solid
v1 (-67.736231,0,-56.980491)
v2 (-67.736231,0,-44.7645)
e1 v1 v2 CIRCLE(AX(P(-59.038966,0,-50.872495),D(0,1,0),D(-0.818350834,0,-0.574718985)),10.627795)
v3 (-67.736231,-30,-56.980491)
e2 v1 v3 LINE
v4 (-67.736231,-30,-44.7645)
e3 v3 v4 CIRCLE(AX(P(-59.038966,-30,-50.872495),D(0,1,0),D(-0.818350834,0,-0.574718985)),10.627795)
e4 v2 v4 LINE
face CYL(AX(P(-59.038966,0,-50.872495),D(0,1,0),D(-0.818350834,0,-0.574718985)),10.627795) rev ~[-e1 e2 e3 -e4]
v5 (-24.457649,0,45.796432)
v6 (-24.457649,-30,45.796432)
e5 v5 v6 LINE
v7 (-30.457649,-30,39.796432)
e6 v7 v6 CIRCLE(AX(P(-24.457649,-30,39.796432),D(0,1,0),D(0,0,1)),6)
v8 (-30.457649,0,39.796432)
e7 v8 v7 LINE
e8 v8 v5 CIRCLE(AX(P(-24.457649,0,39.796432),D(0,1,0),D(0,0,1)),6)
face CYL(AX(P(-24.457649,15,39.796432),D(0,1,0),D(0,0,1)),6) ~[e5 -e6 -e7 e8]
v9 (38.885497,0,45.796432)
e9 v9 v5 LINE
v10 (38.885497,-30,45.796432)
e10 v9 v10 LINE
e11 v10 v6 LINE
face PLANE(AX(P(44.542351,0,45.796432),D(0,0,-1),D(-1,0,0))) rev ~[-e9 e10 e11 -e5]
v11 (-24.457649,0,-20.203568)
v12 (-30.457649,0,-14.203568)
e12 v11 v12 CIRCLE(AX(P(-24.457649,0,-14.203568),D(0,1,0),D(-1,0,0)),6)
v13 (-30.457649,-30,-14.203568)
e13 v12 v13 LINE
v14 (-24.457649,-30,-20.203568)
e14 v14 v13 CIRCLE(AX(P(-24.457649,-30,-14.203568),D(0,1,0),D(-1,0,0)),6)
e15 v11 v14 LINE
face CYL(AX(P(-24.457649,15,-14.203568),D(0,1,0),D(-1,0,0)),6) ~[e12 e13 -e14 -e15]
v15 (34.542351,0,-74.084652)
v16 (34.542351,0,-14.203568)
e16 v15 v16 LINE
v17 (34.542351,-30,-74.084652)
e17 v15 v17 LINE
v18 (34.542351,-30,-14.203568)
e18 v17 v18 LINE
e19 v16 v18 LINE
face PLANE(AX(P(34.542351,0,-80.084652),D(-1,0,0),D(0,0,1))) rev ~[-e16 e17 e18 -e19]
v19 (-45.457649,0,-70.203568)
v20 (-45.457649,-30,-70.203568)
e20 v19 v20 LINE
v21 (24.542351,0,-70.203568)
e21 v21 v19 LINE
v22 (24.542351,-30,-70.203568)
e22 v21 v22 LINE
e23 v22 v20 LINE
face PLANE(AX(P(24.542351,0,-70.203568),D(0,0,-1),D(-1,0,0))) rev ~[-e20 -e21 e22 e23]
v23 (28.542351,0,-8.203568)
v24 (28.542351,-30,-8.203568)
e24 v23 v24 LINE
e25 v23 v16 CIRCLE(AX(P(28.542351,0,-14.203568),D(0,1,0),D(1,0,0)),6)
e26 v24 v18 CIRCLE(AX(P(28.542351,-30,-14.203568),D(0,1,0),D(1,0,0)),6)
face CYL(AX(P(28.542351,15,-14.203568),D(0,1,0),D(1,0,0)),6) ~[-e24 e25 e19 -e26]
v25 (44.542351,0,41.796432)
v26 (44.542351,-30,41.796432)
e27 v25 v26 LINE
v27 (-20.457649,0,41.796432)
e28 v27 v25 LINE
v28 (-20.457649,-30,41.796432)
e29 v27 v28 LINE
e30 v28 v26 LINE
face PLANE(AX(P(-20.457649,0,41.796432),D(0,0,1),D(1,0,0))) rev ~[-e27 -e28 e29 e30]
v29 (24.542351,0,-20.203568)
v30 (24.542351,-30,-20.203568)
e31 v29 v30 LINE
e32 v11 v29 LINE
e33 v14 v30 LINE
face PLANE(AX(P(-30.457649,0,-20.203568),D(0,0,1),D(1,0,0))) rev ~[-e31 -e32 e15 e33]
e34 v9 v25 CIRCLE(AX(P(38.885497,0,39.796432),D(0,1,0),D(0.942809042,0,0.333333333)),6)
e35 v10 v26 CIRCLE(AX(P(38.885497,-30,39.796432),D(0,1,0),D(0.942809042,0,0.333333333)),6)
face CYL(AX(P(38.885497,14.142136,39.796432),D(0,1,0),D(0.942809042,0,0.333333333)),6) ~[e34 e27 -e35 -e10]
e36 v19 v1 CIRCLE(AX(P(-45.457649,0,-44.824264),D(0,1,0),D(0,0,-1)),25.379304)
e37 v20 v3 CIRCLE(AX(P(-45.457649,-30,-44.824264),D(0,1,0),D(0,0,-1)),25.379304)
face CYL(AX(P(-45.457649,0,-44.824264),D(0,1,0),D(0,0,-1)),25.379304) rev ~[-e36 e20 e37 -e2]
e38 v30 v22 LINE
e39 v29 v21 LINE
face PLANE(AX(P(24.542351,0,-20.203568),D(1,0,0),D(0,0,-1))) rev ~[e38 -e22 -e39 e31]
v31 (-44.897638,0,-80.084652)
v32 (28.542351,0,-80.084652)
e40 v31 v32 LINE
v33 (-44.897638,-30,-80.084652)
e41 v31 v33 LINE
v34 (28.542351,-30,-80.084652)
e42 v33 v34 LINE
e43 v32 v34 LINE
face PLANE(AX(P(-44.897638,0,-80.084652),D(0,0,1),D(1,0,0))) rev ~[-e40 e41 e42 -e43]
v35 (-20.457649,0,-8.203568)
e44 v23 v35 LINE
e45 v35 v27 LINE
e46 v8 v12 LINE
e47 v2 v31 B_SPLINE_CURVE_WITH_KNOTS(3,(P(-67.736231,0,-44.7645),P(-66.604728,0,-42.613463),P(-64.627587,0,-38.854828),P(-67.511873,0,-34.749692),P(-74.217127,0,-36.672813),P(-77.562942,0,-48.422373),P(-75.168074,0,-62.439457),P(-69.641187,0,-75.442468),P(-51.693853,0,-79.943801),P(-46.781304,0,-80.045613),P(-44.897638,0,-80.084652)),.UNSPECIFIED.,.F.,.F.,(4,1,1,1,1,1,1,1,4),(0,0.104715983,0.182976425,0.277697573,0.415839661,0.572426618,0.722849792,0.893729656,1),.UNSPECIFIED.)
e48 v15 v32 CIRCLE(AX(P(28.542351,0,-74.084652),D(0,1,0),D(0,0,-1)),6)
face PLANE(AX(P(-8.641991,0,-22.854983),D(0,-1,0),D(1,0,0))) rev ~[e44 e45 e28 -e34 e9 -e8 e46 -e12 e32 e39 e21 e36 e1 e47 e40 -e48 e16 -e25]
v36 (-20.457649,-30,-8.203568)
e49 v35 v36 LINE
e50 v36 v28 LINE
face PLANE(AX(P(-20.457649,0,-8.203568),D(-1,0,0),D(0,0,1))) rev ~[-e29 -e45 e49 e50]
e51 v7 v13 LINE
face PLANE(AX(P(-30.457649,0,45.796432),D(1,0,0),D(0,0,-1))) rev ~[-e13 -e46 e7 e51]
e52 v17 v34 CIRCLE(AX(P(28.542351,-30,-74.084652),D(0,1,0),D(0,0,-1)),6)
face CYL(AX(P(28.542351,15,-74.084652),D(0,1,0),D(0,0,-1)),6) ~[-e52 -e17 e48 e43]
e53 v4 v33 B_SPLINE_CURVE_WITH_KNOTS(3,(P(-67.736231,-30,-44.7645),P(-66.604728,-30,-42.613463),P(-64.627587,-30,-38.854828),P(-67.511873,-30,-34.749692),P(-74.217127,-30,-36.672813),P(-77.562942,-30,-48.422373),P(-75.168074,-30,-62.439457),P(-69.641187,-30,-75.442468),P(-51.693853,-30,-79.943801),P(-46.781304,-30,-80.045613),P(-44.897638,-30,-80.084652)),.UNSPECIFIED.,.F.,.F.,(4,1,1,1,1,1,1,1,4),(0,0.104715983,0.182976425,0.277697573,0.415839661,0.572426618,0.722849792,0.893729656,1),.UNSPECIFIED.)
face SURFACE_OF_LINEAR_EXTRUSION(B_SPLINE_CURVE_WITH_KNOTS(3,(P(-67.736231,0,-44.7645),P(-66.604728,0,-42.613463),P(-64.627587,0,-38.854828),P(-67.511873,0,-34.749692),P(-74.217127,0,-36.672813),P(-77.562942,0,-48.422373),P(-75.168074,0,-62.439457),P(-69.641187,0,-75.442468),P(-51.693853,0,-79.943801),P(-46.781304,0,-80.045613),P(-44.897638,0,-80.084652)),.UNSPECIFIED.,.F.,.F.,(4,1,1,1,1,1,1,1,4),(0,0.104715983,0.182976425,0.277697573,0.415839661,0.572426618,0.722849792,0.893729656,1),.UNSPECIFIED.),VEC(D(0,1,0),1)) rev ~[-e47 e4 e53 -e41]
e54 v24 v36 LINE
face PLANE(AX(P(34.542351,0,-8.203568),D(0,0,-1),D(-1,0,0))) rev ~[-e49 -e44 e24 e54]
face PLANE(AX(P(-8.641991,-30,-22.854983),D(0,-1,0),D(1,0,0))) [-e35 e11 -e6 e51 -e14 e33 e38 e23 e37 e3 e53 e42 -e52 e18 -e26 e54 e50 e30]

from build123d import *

# Parameters (mm, degrees)
F1_DEPTH    = 30
F2_T1_DEPTH = 60
F2_T3_DEPTH = 58.2842712475


# Not quite as in the source:
# - a fillet or chamfer that OpenCascade refuses, or shapes differently, is made with other operations: its cross-section is extruded or revolved along the edge and cut away or added


with BuildPart() as f1:
    # F0 (on Front) → F1 (new body)
    with BuildSketch(Plane.XZ):
        with BuildLine():
            Line((-20.4576485604, 41.7964319587), (44.5423514396, 41.7964319587))
            Line((44.5423514396, 41.7964319587), (44.5423514396, 45.7964319587))
            Line((44.5423514396, 45.7964319587), (-30.4576485604, 45.7964319587))
            Line((-30.4576485604, 45.7964319587), (-30.4576485604, -20.2035680413))
            Line((-30.4576485604, -20.2035680413), (24.5423514396, -20.2035680413))
            Line((24.5423514396, -20.2035680413), (24.5423514396, -70.2035680413))
            Line((24.5423514396, -70.2035680413), (-45.4576485604, -70.2035680413))
            ThreePointArc((-45.4576485604, -70.2035680413), (-58.4112677552, -66.6488561684), (-67.7362307906, -56.9804906845))
            ThreePointArc((-67.7362307906, -56.9804906845), (-69.6667608001, -50.8724953979), (-67.7362307906, -44.7645001113))
            add(Edge.make_bspline(
                [(-67.7362307906, -44.7645001113), (-66.6047282738, -42.6134626855), (-64.6275870644, -38.8548278844), (-67.5118728603, -34.7496923274), (-74.2171267591, -36.6728128022), (-77.5629423301, -48.422372807), (-75.1680740571, -62.4394566894), (-69.641186524, -75.442468141), (-51.6938526184, -79.943801044), (-46.7813036843, -80.045612986), (-44.8976382613, -80.0846517086)],
                knots=[0, 0, 0, 0, 0.1047159829, 0.1829764247, 0.2776975731, 0.4158396611, 0.5724266185, 0.7228497918, 0.8937296562, 1, 1, 1, 1], degree=3))
            Line((-44.8976382613, -80.0846517086), (34.5423514396, -80.0846517086))
            Line((34.5423514396, -80.0846517086), (34.5423514396, -8.2035680413))
            Line((34.5423514396, -8.2035680413), (-20.4576485604, -8.2035680413))
            Line((-20.4576485604, -8.2035680413), (-20.4576485604, 41.7964319587))
        make_face()
    extrude(amount=F1_DEPTH)

    # F2: fillet of radius 6 on 5 edges, made by hand

    # F2_s2 → F2_t1 (cut)
    with BuildSketch(Plane.XZ.offset(-15)):
        with BuildLine():
            ThreePointArc((-24.4576485604, 45.7964319587), (-28.7002892475, 44.0390726458), (-30.4576485604, 39.7964319587))
            Line((-30.4576485604, 39.7964319587), (-30.4576485604, 45.7964319587))
            Line((-30.4576485604, 45.7964319587), (-24.4576485604, 45.7964319587))
        make_face()
        with BuildLine():
            ThreePointArc((-30.4576485604, -14.2035680413), (-28.7002892475, -18.4462087284), (-24.4576485604, -20.2035680413))
            Line((-24.4576485604, -20.2035680413), (-30.4576485604, -20.2035680413))
            Line((-30.4576485604, -20.2035680413), (-30.4576485604, -14.2035680413))
        make_face()
        with BuildLine():
            ThreePointArc((34.5423514396, -14.2035680413), (32.7849921267, -9.9609273542), (28.5423514396, -8.2035680413))
            Line((28.5423514396, -8.2035680413), (34.5423514396, -8.2035680413))
            Line((34.5423514396, -8.2035680413), (34.5423514396, -14.2035680413))
        make_face()
        with BuildLine():
            ThreePointArc((28.5423514396, -80.0846517086), (32.7849921267, -78.3272923957), (34.5423514396, -74.0846517086))
            Line((34.5423514396, -74.0846517086), (34.5423514396, -80.0846517086))
            Line((34.5423514396, -80.0846517086), (28.5423514396, -80.0846517086))
        make_face()
    extrude(amount=F2_T1_DEPTH, mode=Mode.SUBTRACT)

    # F2_s4 → F2_t3 (cut)
    with BuildSketch(Plane.XZ.offset(-14.1421356237)):
        with BuildLine():
            ThreePointArc((44.5423514396, 41.7964319587), (42.3495988052, 44.6954114442), (38.8854971901, 45.7964319587))
            Line((38.8854971901, 45.7964319587), (44.5423514396, 45.7964319587))
            Line((44.5423514396, 45.7964319587), (44.5423514396, 41.7964319587))
        make_face()
    extrude(amount=F2_T3_DEPTH, mode=Mode.SUBTRACT)


solid = f1.part
